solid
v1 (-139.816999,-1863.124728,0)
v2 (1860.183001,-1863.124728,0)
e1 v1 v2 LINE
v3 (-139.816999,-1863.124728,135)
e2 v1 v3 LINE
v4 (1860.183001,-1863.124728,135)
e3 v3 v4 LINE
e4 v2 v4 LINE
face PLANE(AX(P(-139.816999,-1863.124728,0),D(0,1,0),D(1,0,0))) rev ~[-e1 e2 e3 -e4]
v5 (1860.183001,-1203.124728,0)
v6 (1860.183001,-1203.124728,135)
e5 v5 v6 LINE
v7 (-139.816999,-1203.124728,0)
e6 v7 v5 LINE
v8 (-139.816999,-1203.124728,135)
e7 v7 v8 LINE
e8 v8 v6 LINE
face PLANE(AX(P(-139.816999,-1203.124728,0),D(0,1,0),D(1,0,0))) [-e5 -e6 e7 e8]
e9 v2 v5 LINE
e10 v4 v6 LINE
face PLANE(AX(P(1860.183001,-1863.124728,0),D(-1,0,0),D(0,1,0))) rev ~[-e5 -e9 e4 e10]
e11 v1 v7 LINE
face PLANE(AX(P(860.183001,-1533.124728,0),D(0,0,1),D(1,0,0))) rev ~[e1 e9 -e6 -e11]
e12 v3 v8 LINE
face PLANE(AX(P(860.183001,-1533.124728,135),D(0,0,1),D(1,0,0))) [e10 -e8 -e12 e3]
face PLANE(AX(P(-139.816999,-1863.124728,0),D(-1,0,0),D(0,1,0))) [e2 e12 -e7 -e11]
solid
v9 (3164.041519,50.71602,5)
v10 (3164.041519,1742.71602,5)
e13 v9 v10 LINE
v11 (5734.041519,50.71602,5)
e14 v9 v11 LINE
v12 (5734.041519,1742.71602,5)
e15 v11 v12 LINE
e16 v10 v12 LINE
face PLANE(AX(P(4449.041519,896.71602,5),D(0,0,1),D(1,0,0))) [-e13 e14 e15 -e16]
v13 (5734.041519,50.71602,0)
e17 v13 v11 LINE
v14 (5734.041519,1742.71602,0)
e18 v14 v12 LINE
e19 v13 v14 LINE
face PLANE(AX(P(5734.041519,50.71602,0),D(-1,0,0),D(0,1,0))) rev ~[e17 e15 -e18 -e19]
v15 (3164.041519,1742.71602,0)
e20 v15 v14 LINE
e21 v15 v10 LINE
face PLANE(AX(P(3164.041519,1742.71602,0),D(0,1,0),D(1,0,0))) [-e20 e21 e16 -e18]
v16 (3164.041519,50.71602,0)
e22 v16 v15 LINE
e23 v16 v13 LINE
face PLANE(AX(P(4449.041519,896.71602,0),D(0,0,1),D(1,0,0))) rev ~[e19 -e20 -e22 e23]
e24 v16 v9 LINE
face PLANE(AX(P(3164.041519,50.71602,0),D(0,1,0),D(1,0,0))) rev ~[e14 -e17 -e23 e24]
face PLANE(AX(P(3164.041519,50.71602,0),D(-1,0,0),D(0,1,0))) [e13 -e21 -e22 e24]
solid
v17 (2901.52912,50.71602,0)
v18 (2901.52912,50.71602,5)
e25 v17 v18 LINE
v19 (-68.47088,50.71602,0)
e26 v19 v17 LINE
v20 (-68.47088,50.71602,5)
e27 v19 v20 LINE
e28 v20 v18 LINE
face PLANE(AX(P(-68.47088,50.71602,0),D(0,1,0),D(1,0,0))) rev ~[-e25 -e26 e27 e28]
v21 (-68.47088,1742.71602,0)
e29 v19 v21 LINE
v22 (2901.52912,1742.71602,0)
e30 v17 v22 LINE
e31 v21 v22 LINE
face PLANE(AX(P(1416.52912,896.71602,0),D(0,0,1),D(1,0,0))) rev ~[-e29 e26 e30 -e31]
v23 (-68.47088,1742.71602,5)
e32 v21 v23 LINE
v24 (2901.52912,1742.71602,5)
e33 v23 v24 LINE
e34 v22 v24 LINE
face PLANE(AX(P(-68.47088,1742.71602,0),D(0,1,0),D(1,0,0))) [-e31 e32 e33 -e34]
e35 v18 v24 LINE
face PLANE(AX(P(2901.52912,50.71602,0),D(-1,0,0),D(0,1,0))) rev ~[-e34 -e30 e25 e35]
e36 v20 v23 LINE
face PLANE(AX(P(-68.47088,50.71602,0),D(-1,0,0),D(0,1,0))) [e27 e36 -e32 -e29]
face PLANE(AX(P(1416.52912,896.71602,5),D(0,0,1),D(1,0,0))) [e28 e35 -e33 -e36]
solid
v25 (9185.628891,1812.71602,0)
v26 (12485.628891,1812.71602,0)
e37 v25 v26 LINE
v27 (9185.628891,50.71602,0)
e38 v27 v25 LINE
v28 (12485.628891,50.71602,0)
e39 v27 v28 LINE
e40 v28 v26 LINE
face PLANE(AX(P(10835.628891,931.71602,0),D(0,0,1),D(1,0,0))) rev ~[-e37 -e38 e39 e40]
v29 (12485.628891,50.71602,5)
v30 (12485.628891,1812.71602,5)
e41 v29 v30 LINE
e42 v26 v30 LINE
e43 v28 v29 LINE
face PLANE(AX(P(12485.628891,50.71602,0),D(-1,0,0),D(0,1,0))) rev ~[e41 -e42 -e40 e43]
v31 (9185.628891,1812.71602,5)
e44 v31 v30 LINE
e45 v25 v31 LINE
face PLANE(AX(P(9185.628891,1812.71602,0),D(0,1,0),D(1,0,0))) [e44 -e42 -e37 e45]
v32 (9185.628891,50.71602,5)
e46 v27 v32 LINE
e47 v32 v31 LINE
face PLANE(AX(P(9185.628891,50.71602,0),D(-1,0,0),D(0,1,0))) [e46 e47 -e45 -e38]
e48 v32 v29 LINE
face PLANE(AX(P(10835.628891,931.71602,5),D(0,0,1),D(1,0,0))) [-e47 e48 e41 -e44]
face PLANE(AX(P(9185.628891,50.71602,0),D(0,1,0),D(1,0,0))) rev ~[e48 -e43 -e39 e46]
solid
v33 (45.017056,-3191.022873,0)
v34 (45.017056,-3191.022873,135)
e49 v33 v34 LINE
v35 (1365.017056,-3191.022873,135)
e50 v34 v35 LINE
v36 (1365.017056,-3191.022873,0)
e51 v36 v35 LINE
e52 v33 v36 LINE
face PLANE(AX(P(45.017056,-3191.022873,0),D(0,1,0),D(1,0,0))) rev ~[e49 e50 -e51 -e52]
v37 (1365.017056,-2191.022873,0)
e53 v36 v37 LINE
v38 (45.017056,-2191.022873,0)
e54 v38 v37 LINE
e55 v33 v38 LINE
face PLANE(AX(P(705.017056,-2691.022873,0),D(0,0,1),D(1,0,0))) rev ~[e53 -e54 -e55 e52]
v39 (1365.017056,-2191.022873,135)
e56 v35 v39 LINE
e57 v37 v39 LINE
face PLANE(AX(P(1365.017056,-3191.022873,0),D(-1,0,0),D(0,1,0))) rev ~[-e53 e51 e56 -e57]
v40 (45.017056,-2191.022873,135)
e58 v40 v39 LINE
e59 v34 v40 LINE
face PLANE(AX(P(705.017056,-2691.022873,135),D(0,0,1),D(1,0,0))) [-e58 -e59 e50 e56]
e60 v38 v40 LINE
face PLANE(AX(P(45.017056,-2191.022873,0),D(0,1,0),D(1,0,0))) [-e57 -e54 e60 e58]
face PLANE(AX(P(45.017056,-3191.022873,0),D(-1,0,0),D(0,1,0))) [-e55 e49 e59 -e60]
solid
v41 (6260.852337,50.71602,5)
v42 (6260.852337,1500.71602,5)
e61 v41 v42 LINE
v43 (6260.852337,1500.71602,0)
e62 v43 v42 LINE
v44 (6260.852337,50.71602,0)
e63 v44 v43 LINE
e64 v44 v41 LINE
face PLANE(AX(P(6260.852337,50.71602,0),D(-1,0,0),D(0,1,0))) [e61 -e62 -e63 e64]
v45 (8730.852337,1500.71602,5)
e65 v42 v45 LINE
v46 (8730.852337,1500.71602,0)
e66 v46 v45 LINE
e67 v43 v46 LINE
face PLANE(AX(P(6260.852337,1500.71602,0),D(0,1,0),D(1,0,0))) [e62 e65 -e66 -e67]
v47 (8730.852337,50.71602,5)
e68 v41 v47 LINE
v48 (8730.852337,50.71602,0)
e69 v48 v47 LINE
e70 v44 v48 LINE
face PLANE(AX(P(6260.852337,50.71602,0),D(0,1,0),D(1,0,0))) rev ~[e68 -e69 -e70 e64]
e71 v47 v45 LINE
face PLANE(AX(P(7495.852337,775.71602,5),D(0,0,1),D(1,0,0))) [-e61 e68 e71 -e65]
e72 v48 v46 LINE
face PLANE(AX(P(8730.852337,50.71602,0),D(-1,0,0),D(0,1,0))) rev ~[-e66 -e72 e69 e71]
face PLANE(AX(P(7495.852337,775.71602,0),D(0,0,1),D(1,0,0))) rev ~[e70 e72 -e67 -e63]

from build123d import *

# Parameters (mm, degrees)
F0_W     = 2970
F0_H     = 1692
F1_DEPTH = 5
F0_W_2   = 2570
F0_W_3   = 2470
F0_H_2   = 1450
F0_W_4   = 3300
F0_H_3   = 1762
F0_W_5   = 2000
F0_H_4   = 660
F2_DEPTH = 135
F0_W_6   = 1320
F0_H_5   = 1000


with BuildPart() as f1:
    # F0 (on Top) → F1 (new body)
    with BuildSketch(Plane.XY):
        with Locations((1416.5291196108, 896.7160201669)):
            Rectangle(F0_W, F0_H)
    extrude(amount=F1_DEPTH)


with BuildPart() as f1b:
    # F0 (on Top) → F1, piece 2 (new body)
    with BuildSketch(Plane.XY):
        with Locations((4449.041519165, 896.7160201669)):
            Rectangle(F0_W_2, F0_H)
    extrude(amount=F1_DEPTH)


with BuildPart() as f1c:
    # F0 (on Top) → F1, piece 3 (new body)
    with BuildSketch(Plane.XY):
        with Locations((7495.8523368835, 775.7160201669)):
            Rectangle(F0_W_3, F0_H_2)
    extrude(amount=F1_DEPTH)


with BuildPart() as f1d:
    # F0 (on Top) → F1, piece 4 (new body)
    with BuildSketch(Plane.XY):
        with Locations((10835.6288909912, 931.7160201669)):
            Rectangle(F0_W_4, F0_H_3)
    extrude(amount=F1_DEPTH)


with BuildPart() as f2:
    # F0 (on Top) → F2 (new body)
    with BuildSketch(Plane.XY):
        with Locations((860.1830005646, -1533.1247282028)):
            Rectangle(F0_W_5, F0_H_4)
    extrude(amount=F2_DEPTH)


with BuildPart() as f2b:
    # F0 (on Top) → F2, piece 2 (new body)
    with BuildSketch(Plane.XY):
        with Locations((705.0170564651, -2691.0228729248)):
            Rectangle(F0_W_6, F0_H_5)
    extrude(amount=F2_DEPTH)


solid = Compound([f1.part, f1b.part, f1c.part, f1d.part, f2.part, f2b.part])
